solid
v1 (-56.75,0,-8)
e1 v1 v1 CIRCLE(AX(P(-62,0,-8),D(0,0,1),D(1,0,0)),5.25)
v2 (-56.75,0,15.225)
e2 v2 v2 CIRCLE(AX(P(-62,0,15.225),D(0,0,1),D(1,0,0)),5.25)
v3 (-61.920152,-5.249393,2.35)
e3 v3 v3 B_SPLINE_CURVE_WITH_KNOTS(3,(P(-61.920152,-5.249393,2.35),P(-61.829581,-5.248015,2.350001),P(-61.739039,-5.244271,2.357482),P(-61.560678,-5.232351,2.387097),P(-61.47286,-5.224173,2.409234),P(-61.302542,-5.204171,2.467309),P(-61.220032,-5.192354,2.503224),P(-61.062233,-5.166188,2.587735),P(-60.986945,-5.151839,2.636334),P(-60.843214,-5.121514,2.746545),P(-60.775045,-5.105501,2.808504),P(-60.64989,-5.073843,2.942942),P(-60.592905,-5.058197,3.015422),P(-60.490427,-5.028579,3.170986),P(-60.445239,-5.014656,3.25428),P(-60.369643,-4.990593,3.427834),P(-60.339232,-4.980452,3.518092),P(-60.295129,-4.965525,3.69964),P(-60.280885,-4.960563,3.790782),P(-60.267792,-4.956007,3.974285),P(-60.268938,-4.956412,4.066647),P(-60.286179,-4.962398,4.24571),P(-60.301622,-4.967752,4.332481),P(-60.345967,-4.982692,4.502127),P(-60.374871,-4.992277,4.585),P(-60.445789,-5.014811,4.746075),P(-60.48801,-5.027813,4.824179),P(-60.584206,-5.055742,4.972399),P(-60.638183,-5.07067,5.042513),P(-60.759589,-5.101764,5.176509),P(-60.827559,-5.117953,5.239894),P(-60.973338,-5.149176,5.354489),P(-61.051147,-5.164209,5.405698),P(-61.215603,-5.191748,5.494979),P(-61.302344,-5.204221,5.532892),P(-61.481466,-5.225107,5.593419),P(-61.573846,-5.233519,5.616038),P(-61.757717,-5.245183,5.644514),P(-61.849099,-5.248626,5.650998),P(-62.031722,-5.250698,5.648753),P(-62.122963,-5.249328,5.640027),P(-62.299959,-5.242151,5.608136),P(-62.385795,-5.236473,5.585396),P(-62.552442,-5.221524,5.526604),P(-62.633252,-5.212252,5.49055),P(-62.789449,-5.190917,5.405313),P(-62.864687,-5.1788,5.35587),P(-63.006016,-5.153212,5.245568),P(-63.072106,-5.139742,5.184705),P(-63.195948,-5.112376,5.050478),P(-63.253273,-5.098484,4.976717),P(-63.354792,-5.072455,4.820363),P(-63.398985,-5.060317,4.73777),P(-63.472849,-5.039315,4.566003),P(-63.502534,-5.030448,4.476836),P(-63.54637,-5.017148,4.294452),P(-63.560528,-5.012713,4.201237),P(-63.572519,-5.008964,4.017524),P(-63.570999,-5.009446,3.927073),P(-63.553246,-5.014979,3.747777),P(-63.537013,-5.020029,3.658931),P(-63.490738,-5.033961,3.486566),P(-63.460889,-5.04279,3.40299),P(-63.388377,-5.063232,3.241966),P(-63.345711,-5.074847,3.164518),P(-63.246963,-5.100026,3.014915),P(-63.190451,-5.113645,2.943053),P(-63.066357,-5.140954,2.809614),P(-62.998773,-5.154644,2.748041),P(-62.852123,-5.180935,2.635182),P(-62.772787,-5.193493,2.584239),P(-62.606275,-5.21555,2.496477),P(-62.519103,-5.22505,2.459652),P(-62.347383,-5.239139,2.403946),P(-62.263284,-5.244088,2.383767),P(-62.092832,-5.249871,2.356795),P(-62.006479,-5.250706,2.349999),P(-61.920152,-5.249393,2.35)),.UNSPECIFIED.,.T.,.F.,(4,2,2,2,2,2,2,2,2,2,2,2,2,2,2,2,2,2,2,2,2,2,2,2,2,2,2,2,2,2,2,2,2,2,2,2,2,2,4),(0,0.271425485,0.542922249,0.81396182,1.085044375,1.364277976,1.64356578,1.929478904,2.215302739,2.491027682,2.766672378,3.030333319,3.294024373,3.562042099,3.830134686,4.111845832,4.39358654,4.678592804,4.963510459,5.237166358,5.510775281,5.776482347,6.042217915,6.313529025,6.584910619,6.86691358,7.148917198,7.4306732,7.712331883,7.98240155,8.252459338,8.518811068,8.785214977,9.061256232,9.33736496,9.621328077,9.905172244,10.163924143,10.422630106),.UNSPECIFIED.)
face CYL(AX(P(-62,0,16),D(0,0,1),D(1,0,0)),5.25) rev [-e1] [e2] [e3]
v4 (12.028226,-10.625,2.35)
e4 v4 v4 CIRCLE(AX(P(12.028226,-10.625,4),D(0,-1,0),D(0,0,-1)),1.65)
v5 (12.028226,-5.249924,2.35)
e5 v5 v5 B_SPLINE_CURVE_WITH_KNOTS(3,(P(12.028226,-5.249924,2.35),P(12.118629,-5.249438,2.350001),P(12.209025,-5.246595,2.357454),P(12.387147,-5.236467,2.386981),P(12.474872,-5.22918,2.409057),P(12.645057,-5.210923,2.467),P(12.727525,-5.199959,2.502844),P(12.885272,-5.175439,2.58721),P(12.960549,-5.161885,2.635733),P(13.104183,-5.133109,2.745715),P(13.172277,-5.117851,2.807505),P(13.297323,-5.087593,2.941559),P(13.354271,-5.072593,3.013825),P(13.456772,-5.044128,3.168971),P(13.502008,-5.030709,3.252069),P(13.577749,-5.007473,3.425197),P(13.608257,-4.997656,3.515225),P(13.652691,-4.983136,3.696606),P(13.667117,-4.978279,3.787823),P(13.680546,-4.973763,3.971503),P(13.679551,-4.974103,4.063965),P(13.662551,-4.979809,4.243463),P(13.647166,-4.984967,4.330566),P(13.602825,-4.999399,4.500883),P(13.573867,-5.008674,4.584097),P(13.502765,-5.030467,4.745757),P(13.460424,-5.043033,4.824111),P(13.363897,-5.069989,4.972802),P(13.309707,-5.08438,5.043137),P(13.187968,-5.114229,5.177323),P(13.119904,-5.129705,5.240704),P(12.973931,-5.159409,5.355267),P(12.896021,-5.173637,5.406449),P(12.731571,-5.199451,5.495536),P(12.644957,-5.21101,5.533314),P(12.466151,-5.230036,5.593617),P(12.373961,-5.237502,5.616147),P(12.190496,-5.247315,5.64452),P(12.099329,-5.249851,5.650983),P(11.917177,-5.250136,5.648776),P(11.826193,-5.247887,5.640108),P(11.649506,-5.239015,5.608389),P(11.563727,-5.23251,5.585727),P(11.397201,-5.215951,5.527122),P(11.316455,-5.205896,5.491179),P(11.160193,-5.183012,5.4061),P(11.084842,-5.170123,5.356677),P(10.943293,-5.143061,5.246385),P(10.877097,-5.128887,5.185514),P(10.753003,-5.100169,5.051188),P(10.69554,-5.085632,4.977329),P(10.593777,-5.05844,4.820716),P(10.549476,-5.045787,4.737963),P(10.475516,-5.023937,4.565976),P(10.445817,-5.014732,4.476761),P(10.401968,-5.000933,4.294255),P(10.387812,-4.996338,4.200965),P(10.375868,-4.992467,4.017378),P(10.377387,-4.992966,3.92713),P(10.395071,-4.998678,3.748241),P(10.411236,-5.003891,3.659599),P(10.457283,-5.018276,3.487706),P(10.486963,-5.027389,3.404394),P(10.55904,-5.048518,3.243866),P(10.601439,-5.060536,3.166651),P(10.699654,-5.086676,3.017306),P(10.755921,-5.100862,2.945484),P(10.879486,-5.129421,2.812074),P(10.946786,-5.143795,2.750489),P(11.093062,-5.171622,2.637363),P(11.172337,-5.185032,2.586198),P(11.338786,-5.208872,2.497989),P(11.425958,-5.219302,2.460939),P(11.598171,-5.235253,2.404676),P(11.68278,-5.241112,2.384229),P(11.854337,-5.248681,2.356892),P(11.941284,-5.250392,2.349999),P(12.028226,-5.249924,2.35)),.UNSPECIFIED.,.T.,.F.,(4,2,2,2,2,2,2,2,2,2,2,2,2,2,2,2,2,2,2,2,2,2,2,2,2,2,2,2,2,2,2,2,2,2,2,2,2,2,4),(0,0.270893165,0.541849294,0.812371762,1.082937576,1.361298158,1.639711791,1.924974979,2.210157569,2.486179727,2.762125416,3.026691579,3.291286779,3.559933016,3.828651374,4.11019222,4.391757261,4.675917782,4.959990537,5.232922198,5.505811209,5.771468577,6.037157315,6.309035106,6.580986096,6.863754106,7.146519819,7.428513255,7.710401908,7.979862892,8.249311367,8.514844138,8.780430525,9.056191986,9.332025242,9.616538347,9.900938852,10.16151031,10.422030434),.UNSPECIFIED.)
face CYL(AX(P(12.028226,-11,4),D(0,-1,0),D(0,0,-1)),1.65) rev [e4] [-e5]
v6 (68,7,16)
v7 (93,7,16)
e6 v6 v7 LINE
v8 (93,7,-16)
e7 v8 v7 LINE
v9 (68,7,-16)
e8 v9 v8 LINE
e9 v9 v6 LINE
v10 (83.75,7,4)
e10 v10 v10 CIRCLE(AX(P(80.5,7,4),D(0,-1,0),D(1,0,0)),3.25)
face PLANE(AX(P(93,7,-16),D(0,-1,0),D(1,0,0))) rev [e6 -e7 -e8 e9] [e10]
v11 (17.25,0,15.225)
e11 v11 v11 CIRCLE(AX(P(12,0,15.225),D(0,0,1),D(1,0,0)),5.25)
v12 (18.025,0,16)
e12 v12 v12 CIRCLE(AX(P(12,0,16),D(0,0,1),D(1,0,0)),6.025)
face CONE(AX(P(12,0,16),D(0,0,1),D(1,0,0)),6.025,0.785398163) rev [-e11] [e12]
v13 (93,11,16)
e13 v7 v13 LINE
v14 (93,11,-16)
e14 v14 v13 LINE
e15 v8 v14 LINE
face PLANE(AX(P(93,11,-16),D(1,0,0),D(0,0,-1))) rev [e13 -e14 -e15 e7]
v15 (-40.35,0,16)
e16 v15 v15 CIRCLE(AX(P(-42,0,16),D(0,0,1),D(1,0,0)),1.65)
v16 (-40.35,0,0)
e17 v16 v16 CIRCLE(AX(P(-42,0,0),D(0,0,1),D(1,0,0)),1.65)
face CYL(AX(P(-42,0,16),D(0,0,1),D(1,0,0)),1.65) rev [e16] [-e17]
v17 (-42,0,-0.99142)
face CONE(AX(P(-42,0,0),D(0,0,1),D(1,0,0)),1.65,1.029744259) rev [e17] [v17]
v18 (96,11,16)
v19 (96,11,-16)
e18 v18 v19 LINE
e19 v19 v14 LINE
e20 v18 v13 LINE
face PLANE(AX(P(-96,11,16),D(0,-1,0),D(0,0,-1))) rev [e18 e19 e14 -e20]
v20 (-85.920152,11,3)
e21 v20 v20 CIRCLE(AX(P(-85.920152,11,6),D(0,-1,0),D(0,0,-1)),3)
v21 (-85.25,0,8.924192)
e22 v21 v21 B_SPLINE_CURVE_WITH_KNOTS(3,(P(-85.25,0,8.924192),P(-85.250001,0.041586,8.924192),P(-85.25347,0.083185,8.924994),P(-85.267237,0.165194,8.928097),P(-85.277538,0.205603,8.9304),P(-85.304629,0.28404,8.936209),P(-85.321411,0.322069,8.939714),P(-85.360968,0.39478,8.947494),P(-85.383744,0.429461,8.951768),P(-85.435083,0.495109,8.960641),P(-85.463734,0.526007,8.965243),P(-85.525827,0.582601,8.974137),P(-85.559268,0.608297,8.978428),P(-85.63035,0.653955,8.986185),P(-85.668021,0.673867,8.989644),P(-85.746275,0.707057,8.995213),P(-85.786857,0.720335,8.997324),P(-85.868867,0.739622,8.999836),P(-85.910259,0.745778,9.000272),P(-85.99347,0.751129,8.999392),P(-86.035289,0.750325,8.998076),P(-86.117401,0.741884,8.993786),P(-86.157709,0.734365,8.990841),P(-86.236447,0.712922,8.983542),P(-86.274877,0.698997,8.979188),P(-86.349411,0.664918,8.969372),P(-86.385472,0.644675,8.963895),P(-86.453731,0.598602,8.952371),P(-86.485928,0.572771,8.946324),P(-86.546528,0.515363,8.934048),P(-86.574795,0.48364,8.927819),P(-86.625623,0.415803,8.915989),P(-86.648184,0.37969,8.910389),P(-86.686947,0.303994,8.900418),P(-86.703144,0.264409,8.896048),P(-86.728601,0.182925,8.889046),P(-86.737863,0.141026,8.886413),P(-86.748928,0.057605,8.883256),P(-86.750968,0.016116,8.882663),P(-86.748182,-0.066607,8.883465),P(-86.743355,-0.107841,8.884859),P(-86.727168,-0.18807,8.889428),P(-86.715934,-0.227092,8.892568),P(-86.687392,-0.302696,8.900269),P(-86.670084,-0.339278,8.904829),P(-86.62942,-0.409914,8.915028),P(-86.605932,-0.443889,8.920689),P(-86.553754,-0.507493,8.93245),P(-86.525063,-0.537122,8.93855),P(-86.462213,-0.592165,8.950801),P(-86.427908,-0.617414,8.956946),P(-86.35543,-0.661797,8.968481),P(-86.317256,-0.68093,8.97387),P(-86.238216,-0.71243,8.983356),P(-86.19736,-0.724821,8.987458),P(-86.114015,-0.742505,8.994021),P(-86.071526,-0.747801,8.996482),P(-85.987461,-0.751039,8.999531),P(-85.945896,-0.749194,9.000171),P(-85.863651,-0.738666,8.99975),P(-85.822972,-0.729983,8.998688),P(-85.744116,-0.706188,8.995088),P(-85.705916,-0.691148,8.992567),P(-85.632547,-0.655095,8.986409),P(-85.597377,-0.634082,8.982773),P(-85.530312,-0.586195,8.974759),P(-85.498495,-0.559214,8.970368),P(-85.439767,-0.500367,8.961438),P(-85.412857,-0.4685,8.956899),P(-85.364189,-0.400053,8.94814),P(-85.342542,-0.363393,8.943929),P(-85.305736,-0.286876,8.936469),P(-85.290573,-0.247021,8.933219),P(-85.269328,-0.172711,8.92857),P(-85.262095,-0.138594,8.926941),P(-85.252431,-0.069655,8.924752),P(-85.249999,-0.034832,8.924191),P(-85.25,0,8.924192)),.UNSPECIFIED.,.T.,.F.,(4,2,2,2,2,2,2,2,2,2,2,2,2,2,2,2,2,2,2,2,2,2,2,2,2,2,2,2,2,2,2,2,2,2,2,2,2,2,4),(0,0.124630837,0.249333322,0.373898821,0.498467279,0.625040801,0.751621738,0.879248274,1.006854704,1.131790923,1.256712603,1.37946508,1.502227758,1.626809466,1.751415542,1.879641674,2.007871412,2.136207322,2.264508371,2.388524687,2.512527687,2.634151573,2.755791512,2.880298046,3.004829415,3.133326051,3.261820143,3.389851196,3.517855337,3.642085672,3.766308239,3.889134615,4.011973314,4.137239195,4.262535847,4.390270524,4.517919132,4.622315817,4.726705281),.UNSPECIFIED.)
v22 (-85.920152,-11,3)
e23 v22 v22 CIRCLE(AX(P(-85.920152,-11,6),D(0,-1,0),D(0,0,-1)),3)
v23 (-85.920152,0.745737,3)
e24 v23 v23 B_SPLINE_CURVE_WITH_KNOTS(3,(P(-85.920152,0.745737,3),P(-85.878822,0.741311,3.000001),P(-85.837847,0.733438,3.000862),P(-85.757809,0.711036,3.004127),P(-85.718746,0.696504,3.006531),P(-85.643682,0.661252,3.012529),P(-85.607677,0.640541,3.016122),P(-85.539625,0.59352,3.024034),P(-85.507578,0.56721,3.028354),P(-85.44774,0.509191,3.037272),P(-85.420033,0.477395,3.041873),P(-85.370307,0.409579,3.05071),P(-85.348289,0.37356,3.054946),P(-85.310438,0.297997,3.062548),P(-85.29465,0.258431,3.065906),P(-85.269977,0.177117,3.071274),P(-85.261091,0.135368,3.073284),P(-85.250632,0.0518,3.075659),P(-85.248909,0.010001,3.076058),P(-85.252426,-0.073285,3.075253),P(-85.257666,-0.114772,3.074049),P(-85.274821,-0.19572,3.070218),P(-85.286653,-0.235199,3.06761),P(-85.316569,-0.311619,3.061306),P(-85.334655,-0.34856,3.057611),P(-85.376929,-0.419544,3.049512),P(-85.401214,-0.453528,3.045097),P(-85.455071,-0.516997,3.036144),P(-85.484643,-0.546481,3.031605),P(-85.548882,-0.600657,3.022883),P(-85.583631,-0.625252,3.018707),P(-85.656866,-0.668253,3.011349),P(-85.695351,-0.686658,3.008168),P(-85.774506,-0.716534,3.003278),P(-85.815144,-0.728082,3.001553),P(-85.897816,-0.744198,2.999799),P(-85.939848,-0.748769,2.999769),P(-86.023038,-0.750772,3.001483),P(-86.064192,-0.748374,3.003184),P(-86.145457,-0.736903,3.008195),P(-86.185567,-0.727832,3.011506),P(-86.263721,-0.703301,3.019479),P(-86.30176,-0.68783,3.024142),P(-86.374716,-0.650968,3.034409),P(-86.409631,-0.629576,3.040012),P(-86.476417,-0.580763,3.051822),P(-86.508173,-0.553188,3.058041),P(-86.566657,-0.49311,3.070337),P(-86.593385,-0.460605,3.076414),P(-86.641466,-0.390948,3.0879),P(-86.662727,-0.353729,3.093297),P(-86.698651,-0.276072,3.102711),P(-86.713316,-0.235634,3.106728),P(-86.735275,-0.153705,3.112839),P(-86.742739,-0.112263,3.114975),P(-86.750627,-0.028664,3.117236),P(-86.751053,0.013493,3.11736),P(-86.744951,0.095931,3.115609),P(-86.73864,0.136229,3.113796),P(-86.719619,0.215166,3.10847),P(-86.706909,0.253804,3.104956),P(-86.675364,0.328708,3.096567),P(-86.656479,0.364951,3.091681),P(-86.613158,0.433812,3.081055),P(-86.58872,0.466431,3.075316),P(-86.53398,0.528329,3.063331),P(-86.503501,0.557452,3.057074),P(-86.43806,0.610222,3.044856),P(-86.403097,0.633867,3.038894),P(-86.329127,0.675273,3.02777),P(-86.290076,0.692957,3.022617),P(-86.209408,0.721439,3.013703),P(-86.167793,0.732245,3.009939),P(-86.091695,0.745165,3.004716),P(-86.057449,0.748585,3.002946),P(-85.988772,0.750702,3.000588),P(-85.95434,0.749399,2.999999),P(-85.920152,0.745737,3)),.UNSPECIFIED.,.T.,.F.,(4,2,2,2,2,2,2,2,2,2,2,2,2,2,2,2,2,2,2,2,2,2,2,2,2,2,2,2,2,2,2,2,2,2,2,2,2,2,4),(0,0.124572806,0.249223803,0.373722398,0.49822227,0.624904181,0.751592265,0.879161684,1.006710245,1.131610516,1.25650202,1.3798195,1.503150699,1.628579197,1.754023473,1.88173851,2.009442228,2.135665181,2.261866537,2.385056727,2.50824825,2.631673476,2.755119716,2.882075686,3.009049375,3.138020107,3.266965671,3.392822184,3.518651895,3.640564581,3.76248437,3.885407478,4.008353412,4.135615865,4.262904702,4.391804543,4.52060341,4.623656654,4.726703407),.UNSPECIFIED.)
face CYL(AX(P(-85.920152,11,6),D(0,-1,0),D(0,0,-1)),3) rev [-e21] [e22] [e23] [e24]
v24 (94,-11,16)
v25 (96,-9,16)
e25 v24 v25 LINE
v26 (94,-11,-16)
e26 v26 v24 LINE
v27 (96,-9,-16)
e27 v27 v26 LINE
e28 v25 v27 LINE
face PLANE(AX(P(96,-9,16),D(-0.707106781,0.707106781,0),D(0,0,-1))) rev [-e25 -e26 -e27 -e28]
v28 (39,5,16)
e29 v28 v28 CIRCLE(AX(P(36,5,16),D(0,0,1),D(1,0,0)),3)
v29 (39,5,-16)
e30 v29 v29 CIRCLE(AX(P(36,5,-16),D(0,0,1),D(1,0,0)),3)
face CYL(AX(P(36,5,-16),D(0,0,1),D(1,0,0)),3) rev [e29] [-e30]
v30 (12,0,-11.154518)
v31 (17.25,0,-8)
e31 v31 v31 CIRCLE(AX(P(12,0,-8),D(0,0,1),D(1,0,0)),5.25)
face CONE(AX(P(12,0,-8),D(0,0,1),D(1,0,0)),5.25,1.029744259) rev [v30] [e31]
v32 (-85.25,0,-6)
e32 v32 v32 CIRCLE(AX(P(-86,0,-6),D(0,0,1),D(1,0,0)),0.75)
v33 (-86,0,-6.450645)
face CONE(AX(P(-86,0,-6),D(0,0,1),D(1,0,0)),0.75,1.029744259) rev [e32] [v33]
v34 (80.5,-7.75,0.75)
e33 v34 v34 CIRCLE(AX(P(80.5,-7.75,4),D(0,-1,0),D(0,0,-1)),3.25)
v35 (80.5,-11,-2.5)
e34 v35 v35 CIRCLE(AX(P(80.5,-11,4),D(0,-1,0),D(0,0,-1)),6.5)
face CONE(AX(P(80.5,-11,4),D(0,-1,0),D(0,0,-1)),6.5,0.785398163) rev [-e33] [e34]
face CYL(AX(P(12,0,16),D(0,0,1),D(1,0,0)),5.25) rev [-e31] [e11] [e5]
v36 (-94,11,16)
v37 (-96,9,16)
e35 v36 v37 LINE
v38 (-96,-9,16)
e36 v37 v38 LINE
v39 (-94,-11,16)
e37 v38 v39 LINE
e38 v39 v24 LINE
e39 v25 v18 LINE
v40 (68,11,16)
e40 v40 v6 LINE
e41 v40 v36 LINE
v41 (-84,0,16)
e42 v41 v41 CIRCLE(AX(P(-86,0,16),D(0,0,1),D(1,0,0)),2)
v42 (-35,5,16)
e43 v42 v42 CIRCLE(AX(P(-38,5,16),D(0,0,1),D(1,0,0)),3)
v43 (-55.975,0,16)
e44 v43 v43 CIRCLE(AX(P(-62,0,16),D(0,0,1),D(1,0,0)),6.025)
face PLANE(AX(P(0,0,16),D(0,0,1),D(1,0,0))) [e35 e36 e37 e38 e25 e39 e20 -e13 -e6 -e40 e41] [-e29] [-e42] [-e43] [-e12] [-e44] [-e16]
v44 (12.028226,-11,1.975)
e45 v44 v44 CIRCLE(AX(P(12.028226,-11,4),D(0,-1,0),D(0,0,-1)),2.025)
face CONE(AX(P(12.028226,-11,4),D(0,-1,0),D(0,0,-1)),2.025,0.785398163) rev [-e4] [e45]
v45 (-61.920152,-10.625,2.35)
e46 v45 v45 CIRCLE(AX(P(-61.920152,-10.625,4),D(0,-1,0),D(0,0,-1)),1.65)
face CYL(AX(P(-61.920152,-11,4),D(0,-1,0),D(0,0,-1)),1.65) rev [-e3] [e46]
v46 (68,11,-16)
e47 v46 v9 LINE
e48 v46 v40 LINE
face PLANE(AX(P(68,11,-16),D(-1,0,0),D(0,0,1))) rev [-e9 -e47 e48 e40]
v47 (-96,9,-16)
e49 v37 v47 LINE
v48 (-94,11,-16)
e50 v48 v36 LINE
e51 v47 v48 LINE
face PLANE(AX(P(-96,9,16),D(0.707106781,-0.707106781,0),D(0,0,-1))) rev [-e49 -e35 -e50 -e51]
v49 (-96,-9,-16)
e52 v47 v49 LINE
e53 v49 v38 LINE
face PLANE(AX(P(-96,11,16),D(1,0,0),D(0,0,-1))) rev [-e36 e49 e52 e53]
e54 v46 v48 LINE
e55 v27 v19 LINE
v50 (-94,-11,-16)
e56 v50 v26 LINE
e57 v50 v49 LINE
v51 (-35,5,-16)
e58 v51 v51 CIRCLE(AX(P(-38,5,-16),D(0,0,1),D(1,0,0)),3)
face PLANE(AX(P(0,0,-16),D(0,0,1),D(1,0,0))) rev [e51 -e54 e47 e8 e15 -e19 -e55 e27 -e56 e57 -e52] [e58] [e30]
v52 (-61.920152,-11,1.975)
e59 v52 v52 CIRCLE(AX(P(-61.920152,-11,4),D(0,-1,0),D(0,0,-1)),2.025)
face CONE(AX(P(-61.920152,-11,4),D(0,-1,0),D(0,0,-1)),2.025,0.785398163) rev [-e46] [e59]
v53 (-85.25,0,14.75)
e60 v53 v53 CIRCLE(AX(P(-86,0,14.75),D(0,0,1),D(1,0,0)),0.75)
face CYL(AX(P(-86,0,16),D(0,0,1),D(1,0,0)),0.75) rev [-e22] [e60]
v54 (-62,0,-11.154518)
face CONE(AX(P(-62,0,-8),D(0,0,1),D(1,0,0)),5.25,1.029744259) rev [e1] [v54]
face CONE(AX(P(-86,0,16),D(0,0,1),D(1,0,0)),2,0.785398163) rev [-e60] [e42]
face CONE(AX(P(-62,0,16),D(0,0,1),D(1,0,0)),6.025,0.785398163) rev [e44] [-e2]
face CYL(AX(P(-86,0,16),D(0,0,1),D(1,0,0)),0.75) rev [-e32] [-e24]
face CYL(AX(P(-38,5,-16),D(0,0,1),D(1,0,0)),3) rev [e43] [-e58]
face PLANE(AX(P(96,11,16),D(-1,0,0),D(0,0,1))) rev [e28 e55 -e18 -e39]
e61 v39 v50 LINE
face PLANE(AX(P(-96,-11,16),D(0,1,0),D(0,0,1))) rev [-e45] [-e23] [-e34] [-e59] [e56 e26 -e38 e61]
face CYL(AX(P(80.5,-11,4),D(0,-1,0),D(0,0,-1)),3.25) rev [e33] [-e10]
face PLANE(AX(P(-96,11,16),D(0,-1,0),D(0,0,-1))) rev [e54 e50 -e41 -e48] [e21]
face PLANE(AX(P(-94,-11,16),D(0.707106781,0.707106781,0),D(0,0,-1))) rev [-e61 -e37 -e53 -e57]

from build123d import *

# Parameters (mm, degrees)
SKETCH1_W                                        = 192
SKETCH1_H                                        = 22
BOSS_EXTRUDE1_DEPTH                              = 16
SKETCH3_W                                        = 25
SKETCH3_H                                        = 4
CUT_EXTRUDE4_DEPTH                               = 32
M12X1_5_TAPPED_HOLE5_D                           = 10.5
M12X1_5_TAPPED_HOLE5_DEPTH                       = 24
M12X1_5_TAPPED_HOLE5_CSINK_D                     = 12.05
M12X1_5_TAPPED_HOLE5_CSINK_ANGLE                 = 90
M12X1_5_TAPPED_HOLE5_TIP                         = 3.15451825
M4X0_7_TAPPED_HOLE1_D                            = 3.3
M4X0_7_TAPPED_HOLE1_DEPTH                        = 11.5
M4X0_7_TAPPED_HOLE1_CSINK_D                      = 4.05
M4X0_7_TAPPED_HOLE1_CSINK_ANGLE                  = 90
M4X0_7_TAPPED_HOLE1_TIP                          = 0.991420021
SKETCH18_R                                       = 3
CUT_EXTRUDE5_DEPTH                               = 102.788997441
CHAMFER1_SIZE                                    = 2
CSK_FOR_M10_FLAT_HEAD_MACHINE_SCREW2_D           = 6.5
CSK_FOR_M10_FLAT_HEAD_MACHINE_SCREW2_CSINK_D     = 13
CSK_FOR_M10_FLAT_HEAD_MACHINE_SCREW2_CSINK_ANGLE = 90
SKETCH24_R                                       = 3
CUT_EXTRUDE6_DEPTH                               = 100.779757466


# Read off the part's stored shape, not the designer's step: CSK for M4 Countersunk Flat Head Screw2, M4 Tapped Hole2
with BuildPart() as part:
    # Sketch1 → Boss-Extrude1 (new, symmetric)
    with BuildSketch(Plane.XY):
        Rectangle(SKETCH1_W, SKETCH1_H)
    extrude(amount=BOSS_EXTRUDE1_DEPTH, both=True)

    # Sketch3 → Cut-Extrude4 (cut)
    with BuildSketch(Plane.XY.offset(16)):
        with Locations((80.5, 9)):
            Rectangle(SKETCH3_W, SKETCH3_H)
    extrude(amount=-CUT_EXTRUDE4_DEPTH, mode=Mode.SUBTRACT)

    # M12x1.5 Tapped Hole5
    with Locations(Plane.XY.offset(16)):
        with Locations((12, 0), (-62, 0)):
            CounterSinkHole(M12X1_5_TAPPED_HOLE5_D / 2, M12X1_5_TAPPED_HOLE5_CSINK_D / 2, depth=M12X1_5_TAPPED_HOLE5_DEPTH, counter_sink_angle=M12X1_5_TAPPED_HOLE5_CSINK_ANGLE)
            with Locations((0, 0, -(M12X1_5_TAPPED_HOLE5_DEPTH + M12X1_5_TAPPED_HOLE5_TIP / 2))):  # 118° drill point
                Cone(0, M12X1_5_TAPPED_HOLE5_D / 2, M12X1_5_TAPPED_HOLE5_TIP, mode=Mode.SUBTRACT)

    # M4x0.7 Tapped Hole1
    with Locations(Plane.XZ.offset(11)):
        with Locations((-61.920151764, 4), (12.028225588, 4)):
            CounterSinkHole(M4X0_7_TAPPED_HOLE1_D / 2, M4X0_7_TAPPED_HOLE1_CSINK_D / 2, depth=M4X0_7_TAPPED_HOLE1_DEPTH, counter_sink_angle=M4X0_7_TAPPED_HOLE1_CSINK_ANGLE)
            with Locations((0, 0, -(M4X0_7_TAPPED_HOLE1_DEPTH + M4X0_7_TAPPED_HOLE1_TIP / 2))):  # 118° drill point
                Cone(0, M4X0_7_TAPPED_HOLE1_D / 2, M4X0_7_TAPPED_HOLE1_TIP, mode=Mode.SUBTRACT)

    # Sketch18 → Cut-Extrude5 (cut, through all)
    with BuildSketch(Plane.XY.offset(16)):
        with Locations((-38, 5)):
            Circle(SKETCH18_R)
        with Locations((36, 5)):
            Circle(SKETCH18_R)
    extrude(amount=-CUT_EXTRUDE5_DEPTH, mode=Mode.SUBTRACT)

    # Chamfer1
    chamfer1_edges = [part.edges().sort_by_distance(p)[0] for p in [
        (96, -11, 0),
        (-96, -11, 0),
        (-96, 11, 0),
    ]]
    chamfer(chamfer1_edges, length=CHAMFER1_SIZE)

    # CSK for M10 Flat Head Machine Screw2 (through all)
    with Locations(Plane.XZ.offset(11)):
        with Locations((80.5, 4)):
            CounterSinkHole(CSK_FOR_M10_FLAT_HEAD_MACHINE_SCREW2_D / 2, CSK_FOR_M10_FLAT_HEAD_MACHINE_SCREW2_CSINK_D / 2, counter_sink_angle=CSK_FOR_M10_FLAT_HEAD_MACHINE_SCREW2_CSINK_ANGLE)

    # Sketch24 → Cut-Extrude6 (cut, through all)
    with BuildSketch(Plane.XZ.offset(11)):
        with Locations(Location((-85.920151764, 6, 0), (0, 0, 270))):
            Circle(SKETCH24_R)
    extrude(amount=-CUT_EXTRUDE6_DEPTH, mode=Mode.SUBTRACT)

    # CSK for M4 Countersunk Flat Head Scr 2 → CSK for M4 Countersunk Flat Head Screw2 (revolve, cut)
    with BuildSketch(Plane(origin=(-86, 0, 0), x_dir=(1, 0, 0), z_dir=(0, -1, 0))):
        Polygon((0, 8.882881782), (0.75, 8.882881782), (0.75, 14.75), (2, 16), (0, 16), align=None)
        Polygon((0.75, -6), (0.75, 3.117108952), (0, 3.117108952), (0, -6.450645464), align=None)
    revolve(axis=Axis((-86, 0, 0), (0, 0, 1)), mode=Mode.SUBTRACT)

    # M4 Tapped Hole2 outline → M4 Tapped Hole2 (revolve, cut)
    with BuildSketch(Plane(origin=(-42, 0, 0), x_dir=(1, 0, 0), z_dir=(0, -1, 0))):
        Polygon((0, 16), (0, -0.991420021), (1.65, 0), (1.65, 16), align=None)
    revolve(axis=Axis((-42, 0, 0), (0, 0, 1)), mode=Mode.SUBTRACT)


solid = part.part
